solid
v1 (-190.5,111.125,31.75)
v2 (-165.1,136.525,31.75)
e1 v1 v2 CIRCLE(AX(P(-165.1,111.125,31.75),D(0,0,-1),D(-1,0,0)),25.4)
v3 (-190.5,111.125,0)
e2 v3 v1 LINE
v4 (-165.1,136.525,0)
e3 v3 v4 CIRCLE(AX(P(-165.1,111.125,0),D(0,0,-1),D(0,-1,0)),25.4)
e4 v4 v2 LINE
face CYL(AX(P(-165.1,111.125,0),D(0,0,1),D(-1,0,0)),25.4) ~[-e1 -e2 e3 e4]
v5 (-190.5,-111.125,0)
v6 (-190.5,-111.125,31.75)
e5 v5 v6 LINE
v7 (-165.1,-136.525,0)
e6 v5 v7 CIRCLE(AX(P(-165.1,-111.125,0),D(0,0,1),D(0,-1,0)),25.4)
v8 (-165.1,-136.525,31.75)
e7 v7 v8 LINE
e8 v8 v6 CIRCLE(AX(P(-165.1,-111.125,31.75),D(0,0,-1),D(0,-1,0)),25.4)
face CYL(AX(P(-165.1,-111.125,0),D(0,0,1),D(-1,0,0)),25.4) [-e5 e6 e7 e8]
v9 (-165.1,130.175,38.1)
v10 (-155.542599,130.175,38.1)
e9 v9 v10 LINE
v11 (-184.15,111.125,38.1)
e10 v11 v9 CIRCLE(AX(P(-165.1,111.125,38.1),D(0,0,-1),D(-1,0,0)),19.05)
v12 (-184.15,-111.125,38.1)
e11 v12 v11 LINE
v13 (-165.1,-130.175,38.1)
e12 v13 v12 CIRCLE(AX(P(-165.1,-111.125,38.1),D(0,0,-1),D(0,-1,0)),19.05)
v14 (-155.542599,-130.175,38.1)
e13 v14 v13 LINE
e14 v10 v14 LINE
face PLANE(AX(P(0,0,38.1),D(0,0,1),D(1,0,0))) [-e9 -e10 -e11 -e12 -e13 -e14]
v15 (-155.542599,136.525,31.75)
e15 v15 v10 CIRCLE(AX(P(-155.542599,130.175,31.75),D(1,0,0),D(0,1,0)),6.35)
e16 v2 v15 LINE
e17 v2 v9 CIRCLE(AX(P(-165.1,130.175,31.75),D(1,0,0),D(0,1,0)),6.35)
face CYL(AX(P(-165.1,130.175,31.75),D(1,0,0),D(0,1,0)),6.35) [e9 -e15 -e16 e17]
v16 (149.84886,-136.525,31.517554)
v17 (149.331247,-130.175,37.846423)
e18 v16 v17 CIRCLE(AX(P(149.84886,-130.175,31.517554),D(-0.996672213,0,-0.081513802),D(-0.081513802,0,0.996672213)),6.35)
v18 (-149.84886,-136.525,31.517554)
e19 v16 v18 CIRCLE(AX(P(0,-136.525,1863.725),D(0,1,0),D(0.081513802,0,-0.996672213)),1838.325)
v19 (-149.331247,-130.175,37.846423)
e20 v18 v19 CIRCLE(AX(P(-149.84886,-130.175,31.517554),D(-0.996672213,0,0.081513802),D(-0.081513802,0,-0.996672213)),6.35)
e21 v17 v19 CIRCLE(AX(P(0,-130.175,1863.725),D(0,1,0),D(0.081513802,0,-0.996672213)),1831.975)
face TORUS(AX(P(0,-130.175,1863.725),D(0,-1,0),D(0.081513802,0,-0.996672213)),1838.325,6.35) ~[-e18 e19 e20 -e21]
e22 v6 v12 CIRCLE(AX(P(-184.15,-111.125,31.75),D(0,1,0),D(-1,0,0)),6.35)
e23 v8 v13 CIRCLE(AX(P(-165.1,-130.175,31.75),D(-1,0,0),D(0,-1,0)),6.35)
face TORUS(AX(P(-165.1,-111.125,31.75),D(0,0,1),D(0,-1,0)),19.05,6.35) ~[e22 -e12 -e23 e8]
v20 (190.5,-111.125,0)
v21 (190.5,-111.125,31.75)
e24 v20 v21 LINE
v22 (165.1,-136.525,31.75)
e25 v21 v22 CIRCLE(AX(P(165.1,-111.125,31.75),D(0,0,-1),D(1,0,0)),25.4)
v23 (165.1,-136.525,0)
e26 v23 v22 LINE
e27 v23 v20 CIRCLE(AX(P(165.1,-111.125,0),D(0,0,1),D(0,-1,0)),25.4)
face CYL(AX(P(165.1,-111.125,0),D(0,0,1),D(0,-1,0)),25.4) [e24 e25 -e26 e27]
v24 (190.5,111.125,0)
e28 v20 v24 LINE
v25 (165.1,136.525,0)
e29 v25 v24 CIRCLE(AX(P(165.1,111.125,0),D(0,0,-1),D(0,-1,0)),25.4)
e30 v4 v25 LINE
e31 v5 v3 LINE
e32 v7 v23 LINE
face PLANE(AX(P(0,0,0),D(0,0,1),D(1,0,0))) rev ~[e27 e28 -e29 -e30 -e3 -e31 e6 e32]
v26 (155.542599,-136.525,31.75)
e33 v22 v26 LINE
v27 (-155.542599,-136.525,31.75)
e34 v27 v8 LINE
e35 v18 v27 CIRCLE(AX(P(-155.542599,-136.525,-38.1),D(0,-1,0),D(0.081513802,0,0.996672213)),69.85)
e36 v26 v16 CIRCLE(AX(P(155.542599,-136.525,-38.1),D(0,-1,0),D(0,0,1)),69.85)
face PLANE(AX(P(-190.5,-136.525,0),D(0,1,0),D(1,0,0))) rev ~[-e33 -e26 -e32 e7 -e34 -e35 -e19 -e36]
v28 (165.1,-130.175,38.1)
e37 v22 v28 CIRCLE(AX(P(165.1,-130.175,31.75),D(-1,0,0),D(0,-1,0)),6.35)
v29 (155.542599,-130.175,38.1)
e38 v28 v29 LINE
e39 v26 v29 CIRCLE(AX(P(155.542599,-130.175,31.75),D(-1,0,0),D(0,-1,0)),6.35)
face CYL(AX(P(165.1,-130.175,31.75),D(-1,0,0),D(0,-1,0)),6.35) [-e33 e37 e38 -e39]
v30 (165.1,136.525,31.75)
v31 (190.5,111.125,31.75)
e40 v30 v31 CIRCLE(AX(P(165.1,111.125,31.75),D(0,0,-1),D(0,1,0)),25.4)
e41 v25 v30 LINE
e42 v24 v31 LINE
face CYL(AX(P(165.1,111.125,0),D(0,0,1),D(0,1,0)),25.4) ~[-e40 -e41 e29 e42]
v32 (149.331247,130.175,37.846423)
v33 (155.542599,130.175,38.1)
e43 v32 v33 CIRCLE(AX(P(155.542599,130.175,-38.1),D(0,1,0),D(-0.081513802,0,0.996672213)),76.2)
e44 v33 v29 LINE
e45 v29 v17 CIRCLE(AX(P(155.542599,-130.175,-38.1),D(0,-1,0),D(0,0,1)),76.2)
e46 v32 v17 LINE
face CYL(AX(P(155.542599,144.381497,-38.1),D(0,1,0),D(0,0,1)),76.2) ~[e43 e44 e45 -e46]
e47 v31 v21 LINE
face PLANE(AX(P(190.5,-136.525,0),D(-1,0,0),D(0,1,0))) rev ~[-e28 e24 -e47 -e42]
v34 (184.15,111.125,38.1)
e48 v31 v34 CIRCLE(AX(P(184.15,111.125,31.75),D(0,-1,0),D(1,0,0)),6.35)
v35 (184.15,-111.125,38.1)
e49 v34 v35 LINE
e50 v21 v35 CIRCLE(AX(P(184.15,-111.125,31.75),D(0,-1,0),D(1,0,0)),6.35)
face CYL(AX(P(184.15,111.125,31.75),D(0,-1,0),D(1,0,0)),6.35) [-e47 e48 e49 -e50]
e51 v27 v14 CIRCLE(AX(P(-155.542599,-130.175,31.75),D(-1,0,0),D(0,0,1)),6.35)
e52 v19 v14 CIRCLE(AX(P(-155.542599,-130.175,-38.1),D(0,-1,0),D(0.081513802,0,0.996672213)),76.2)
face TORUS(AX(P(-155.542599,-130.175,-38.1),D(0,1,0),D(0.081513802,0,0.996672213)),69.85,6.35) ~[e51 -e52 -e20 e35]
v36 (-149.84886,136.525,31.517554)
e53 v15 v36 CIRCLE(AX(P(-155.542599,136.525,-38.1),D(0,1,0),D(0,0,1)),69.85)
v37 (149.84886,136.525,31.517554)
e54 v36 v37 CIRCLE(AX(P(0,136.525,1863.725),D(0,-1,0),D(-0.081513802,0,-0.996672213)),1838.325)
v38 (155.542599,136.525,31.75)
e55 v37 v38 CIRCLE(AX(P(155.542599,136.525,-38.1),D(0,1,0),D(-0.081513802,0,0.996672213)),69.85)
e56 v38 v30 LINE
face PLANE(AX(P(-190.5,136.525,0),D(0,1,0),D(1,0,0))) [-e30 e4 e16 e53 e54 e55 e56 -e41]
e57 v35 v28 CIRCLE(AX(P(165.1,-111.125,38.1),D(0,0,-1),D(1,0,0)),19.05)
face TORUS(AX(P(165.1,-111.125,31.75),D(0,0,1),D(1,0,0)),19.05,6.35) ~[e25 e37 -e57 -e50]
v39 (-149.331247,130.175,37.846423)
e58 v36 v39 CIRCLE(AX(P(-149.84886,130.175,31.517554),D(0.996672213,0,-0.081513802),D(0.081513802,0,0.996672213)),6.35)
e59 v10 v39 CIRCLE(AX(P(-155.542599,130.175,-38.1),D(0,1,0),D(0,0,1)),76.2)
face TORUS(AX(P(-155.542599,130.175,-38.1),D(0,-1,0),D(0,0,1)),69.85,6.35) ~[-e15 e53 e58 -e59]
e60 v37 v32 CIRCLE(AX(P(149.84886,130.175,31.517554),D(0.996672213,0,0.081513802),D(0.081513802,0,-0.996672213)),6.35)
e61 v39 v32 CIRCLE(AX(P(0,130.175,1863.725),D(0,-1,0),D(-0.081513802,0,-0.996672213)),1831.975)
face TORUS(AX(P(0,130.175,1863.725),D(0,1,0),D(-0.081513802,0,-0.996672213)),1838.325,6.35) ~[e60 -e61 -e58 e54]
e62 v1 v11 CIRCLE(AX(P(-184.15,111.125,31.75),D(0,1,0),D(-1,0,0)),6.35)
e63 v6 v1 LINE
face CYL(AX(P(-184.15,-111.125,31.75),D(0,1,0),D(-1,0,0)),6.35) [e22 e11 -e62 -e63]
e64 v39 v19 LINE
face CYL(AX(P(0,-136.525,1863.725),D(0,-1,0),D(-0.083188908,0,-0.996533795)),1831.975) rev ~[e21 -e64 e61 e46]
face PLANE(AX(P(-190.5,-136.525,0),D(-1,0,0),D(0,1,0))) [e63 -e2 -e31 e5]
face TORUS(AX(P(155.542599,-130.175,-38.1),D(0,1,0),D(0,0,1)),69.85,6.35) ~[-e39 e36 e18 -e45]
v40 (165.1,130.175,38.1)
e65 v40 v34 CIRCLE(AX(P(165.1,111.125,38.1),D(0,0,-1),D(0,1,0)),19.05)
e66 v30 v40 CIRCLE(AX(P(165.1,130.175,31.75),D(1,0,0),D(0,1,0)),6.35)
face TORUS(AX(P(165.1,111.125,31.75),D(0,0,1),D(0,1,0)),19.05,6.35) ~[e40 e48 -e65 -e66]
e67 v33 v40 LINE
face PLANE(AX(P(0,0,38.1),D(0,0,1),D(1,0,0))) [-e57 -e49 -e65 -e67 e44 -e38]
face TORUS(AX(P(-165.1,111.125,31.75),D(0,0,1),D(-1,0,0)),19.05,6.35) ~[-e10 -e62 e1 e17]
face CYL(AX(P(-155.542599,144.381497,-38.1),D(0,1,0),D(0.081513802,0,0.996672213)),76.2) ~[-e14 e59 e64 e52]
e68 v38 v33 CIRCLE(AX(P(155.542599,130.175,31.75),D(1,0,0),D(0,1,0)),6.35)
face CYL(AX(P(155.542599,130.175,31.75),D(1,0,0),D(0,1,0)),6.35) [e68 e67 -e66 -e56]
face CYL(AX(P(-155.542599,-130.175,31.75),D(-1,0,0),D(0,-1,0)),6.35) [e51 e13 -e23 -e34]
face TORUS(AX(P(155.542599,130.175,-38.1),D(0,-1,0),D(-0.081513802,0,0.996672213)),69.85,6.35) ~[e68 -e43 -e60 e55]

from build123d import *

# Parameters (mm, degrees)
F0_W        = 381
F0_H        = 273.05
F1_DEPTH    = 38.1
F3_DEPTH    = 273.051
F4_T1_DEPTH = 288.7629933337
F5_R        = 25.4
F6_R        = 6.35


# Not quite as in the source:
# - a fillet or chamfer that OpenCascade refuses, or shapes differently, is made with other operations: its cross-section is extruded or revolved along the edge and cut away or added


with BuildPart() as f1:
    # F0 (on Top) → F1 (new body)
    with BuildSketch(Plane.XY):
        Rectangle(F0_W, F0_H)
    extrude(amount=F1_DEPTH)

    # F2 (on face) → F3 (cut, through all)
    with BuildSketch(Plane.XZ.offset(136.525)):
        with BuildLine():
            Line((152.4, 38.1), (-152.4, 38.1))
            ThreePointArc((-152.4, 38.1), (0, 31.75), (152.4, 38.1))
        make_face()
    extrude(amount=-F3_DEPTH, mode=Mode.SUBTRACT)

    # F4: fillet of radius 76.2 on 2 edges, made by hand

    # F4_s2 → F4_t1 (cut)
    with BuildSketch(Plane.XZ.offset(-144.3814966668)):
        with BuildLine():
            ThreePointArc((155.5425986667, 38.1), (152.4343358341, 38.0365792649), (149.3312469729, 37.846422629))
            ThreePointArc((149.3312469729, 37.846422629), (150.8656767636, 37.9725665634), (152.4, 38.1))
            Line((152.4, 38.1), (155.5425986667, 38.1))
        make_face()
        with BuildLine():
            ThreePointArc((-149.3312469729, 37.846422629), (-152.4343358341, 38.0365792649), (-155.5425986667, 38.1))
            Line((-155.5425986667, 38.1), (-152.4, 38.1))
            ThreePointArc((-152.4, 38.1), (-150.8656767636, 37.9725665634), (-149.3312469729, 37.846422629))
        make_face()
    extrude(amount=F4_T1_DEPTH, mode=Mode.SUBTRACT)

    # F5
    f5_edges = [f1.edges().sort_by_distance(p)[0] for p in [
        (-190.5, -136.525, 19.05),
        (190.5, -136.525, 19.05),
        (190.5, 136.525, 19.05),
        (-190.5, 136.525, 19.05),
    ]]
    fillet(f5_edges, radius=F5_R)

    # F6
    f6_edges = [f1.edges().sort_by_distance(p)[0] for p in [
        (160.321299, 136.525, 38.1),
    ]]
    fillet(f6_edges, radius=F6_R)


solid = f1.part
